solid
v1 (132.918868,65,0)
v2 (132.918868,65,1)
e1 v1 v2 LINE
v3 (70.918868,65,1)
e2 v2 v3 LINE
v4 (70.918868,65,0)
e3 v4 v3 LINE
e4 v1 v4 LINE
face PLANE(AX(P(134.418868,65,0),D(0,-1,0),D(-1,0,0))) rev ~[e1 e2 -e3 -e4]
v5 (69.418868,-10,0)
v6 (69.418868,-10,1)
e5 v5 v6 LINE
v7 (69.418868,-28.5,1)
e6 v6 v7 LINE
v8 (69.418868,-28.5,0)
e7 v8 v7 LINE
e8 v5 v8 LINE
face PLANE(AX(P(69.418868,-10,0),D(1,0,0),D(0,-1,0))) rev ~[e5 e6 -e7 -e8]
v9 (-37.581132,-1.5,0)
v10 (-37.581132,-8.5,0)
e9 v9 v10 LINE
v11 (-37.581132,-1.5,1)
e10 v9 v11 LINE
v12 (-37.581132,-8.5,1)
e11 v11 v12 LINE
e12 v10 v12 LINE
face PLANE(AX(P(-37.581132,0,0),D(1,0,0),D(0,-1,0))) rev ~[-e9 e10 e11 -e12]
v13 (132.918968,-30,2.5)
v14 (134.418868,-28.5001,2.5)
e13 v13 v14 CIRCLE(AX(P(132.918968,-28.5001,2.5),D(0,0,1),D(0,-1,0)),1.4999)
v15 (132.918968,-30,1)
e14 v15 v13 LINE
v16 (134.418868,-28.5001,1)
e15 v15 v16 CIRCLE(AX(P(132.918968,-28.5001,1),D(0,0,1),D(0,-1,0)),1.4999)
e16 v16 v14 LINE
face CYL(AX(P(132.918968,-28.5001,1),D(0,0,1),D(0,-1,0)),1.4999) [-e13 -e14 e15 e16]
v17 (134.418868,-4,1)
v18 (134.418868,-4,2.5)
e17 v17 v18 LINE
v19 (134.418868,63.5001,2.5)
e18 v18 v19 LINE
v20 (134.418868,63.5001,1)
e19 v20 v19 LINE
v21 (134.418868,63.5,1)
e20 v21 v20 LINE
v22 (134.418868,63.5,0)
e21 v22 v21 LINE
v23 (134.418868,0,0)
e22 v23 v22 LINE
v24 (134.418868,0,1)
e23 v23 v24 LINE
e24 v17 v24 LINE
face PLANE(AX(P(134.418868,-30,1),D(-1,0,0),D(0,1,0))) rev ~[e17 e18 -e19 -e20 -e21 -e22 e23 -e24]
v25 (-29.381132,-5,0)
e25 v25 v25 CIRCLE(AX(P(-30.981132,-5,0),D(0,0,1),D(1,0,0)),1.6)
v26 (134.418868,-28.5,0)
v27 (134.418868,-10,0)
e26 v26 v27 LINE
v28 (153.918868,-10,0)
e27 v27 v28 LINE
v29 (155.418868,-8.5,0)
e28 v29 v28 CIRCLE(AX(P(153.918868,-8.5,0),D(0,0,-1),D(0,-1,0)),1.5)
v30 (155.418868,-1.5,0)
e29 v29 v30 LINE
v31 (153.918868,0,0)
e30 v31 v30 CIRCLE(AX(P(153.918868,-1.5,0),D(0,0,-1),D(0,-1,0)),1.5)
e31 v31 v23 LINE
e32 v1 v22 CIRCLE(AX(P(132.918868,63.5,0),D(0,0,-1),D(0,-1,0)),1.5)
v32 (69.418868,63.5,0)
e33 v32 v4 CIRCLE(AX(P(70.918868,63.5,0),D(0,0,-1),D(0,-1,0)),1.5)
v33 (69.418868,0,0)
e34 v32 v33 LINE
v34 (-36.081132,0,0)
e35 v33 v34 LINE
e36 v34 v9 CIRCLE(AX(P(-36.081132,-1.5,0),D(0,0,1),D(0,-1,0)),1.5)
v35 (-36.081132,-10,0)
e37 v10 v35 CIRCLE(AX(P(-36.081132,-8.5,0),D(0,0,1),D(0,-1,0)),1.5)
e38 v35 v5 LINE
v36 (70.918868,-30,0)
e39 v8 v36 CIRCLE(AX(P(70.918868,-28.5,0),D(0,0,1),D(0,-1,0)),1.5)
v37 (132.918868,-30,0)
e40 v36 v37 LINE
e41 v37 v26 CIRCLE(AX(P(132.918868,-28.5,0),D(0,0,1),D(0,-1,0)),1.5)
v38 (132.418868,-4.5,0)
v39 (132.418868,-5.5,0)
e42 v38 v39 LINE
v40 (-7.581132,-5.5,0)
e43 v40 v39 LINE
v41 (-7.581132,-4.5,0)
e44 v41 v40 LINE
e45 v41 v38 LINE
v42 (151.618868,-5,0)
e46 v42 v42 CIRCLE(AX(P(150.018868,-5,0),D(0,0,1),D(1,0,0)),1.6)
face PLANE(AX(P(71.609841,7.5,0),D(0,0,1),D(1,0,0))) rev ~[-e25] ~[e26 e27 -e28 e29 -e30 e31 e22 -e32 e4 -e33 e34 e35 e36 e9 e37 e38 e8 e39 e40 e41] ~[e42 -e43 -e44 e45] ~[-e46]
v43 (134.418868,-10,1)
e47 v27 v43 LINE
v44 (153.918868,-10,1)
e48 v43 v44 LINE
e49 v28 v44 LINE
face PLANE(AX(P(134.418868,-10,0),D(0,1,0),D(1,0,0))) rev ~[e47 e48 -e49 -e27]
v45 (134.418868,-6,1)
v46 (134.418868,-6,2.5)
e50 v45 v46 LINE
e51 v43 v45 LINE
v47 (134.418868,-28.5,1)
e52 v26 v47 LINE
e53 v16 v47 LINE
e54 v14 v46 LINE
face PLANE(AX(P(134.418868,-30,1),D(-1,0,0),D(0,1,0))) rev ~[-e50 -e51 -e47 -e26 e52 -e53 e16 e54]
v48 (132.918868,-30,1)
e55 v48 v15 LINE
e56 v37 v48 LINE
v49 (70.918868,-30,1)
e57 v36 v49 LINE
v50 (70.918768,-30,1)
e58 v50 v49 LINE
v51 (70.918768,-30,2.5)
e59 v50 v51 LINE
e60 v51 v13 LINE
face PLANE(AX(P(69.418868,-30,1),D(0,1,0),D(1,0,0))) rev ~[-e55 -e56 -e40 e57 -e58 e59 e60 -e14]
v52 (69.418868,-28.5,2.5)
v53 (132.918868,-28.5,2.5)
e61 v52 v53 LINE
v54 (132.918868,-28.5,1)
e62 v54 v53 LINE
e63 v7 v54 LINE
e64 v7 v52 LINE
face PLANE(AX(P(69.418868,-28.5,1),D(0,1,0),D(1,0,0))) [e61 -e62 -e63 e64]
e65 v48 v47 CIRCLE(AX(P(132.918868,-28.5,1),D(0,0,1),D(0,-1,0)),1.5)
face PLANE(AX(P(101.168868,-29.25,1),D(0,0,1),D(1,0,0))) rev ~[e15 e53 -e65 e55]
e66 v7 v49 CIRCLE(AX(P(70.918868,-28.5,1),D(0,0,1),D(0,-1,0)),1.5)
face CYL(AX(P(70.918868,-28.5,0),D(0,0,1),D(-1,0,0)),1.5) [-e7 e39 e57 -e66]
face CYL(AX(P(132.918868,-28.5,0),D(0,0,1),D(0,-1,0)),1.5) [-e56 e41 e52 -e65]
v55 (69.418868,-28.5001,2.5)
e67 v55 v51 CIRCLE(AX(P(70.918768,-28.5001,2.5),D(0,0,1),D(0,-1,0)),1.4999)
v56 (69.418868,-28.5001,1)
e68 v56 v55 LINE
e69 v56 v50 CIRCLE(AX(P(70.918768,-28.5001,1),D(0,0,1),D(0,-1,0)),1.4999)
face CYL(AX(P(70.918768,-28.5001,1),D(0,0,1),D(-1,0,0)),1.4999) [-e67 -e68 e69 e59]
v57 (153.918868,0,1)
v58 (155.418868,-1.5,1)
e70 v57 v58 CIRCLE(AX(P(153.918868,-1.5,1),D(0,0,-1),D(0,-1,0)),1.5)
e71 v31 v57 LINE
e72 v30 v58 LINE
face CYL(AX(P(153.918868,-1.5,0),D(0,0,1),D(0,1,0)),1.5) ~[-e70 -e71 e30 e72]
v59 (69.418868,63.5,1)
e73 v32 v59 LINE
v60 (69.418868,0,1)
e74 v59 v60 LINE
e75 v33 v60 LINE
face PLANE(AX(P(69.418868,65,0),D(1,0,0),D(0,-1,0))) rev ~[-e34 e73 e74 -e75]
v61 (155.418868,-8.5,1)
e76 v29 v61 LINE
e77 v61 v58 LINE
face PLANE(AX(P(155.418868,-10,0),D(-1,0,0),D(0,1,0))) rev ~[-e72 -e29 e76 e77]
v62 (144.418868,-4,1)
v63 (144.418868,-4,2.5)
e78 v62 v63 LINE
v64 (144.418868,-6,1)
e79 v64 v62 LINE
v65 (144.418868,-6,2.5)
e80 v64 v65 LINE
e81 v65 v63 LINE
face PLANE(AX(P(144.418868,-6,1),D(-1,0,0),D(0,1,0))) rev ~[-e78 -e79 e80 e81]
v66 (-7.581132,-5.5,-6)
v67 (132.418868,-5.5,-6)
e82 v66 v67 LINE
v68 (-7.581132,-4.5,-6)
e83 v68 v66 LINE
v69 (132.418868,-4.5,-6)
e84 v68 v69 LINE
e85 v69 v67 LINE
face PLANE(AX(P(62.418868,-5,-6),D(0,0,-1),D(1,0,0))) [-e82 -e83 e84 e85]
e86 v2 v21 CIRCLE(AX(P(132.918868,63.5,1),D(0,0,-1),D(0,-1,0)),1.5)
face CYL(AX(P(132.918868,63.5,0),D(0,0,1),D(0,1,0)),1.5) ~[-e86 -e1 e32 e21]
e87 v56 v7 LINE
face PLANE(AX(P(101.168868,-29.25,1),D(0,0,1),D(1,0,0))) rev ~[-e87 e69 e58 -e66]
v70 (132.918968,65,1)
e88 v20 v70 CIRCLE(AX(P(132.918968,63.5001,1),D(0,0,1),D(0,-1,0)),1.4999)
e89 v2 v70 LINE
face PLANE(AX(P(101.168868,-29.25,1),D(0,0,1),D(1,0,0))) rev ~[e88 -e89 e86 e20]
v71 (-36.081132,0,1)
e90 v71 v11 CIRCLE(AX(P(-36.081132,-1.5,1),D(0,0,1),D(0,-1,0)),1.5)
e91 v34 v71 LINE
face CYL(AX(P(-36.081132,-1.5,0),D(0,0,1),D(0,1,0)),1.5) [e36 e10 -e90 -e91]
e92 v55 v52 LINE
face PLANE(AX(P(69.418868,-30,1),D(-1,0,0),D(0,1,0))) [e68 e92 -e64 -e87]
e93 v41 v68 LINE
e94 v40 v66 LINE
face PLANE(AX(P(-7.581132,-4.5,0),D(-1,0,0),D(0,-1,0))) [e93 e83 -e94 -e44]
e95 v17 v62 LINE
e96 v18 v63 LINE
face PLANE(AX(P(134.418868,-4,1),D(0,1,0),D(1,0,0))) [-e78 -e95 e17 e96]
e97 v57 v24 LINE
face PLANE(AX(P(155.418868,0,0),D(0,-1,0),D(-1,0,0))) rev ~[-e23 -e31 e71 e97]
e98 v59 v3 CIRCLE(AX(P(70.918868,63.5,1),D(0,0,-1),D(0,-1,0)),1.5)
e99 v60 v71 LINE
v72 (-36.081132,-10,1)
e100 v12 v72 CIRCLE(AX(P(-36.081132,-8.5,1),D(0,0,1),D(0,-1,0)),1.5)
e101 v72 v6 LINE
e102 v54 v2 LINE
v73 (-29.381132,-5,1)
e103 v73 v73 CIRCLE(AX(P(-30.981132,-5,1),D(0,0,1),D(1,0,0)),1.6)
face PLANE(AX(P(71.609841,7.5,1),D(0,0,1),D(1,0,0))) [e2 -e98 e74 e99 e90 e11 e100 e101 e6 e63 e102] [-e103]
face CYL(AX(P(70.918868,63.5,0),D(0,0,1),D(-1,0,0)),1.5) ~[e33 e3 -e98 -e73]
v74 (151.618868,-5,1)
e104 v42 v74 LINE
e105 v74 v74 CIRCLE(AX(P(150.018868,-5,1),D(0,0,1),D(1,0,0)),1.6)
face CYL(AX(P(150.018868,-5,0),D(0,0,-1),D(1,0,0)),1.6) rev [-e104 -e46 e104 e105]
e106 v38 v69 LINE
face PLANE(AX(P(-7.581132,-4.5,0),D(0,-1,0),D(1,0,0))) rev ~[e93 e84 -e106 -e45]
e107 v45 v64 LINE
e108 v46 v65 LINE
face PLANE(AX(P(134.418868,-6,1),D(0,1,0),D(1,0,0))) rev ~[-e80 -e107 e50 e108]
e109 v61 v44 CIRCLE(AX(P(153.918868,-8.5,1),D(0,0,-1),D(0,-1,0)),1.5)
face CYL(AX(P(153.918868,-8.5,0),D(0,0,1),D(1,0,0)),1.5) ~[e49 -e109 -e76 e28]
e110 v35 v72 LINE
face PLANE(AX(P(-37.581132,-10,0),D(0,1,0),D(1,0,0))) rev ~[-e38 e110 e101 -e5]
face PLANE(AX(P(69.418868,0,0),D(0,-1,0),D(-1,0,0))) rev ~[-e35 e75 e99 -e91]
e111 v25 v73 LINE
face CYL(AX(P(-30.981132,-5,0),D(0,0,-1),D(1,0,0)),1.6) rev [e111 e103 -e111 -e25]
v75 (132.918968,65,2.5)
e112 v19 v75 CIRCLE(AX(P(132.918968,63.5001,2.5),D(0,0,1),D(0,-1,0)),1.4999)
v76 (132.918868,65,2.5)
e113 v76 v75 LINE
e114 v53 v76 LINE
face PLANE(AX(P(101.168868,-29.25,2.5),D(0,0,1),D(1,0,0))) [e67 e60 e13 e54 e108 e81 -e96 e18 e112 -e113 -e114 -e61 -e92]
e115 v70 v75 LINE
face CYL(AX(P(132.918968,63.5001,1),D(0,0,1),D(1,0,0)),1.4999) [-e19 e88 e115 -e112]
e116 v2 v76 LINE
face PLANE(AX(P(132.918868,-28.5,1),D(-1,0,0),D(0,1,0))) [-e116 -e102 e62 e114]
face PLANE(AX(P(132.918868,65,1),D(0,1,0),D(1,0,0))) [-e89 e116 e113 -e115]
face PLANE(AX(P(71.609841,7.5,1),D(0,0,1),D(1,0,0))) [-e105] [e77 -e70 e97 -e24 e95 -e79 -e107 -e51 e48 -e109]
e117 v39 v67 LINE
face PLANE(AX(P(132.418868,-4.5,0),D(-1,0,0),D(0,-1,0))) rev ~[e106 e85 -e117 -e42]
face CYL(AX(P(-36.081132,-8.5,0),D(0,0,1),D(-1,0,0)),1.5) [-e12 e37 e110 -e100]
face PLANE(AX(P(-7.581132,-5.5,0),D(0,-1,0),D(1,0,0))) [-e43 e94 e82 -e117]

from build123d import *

# Parameters (mm, degrees)
F0_R     = 1.6
F1_DEPTH = 1
F2_R     = 1.5
F3_W     = 140
F3_H     = 1
F4_DEPTH = 6
F5_W     = 63.5
F5_H     = 1.5
F5_W_2   = 1.5
F5_H_2   = 93.5
F6_DEPTH = 1.5
F7_R     = 1.4999
F8_W     = 10
F8_H     = 2
F9_DEPTH = 1.5


# Not quite as in the source:
# - a fillet or chamfer is up to 0.001 mm smaller than in the source, because OpenCascade refuses the exact size


with BuildPart() as f1:
    # F0 (on Top) → F1 (new body)
    with BuildSketch(Plane.XY):
        Polygon((69.4188682817, 0), (-37.5811317183, 0), (-37.5811317183, -10), (69.4188682817, -10), (69.4188682817, -30), (134.4188682817, -30), (134.4188682817, -10), (155.4188682817, -10), (155.4188682817, 0), (134.4188682817, 0), (134.4188682817, 65), (69.4188682817, 65), align=None)
        with Locations((-30.9811317183, -5)):
            Circle(F0_R, mode=Mode.SUBTRACT)
        with Locations((150.0188682817, -5)):
            Circle(F0_R, mode=Mode.SUBTRACT)
    extrude(amount=F1_DEPTH)

    # F2
    f2_edges = [f1.edges().sort_by_distance(p)[0] for p in [
        (-37.581132, 0, 0.5),
        (-37.581132, -10, 0.5),
        (155.418868, 0, 0.5),
        (155.418868, -10, 0.5),
        (134.418868, -30, 0.5),
        (69.418868, -30, 0.5),
        (69.418868, 65, 0.5),
        (134.418868, 65, 0.5),
    ]]
    fillet(f2_edges, radius=F2_R)

    # F3 (on face) → F4 (join)
    with BuildSketch(Plane(origin=(0, 0, 0), x_dir=(1, 0, 0), z_dir=(0, 0, -1))):
        with Locations((62.4188682817, 5)):
            Rectangle(F3_W, F3_H)
    extrude(amount=F4_DEPTH)

    # F5 (on face) → F6 (join)
    with BuildSketch(Plane.XY.offset(1)):
        with Locations((101.1688682817, -29.25)):
            Rectangle(F5_W, F5_H)
        with Locations((133.6688682817, 18.25)):
            Rectangle(F5_W_2, F5_H_2)
        with Locations((133.6688682817, -29.25)):
            Rectangle(F5_W_2, F5_H)
    extrude(amount=F6_DEPTH)

    # F7 (radius 1.5 in the source; OpenCascade refuses exactly that, so slightly less here)
    f7_edges = [f1.edges().sort_by_distance(p)[0] for p in [
        (134.418868, -30, 1.75),
        (69.418868, -30, 1.75),
        (134.418868, 65, 1.75),
    ]]
    fillet(f7_edges, radius=F7_R)

    # F8 (on face) → F9 (join, through all)
    with BuildSketch(Plane.XY.offset(1)):
        with Locations((139.4188682817, -5)):
            Rectangle(F8_W, F8_H)
    extrude(amount=F9_DEPTH)


solid = f1.part
